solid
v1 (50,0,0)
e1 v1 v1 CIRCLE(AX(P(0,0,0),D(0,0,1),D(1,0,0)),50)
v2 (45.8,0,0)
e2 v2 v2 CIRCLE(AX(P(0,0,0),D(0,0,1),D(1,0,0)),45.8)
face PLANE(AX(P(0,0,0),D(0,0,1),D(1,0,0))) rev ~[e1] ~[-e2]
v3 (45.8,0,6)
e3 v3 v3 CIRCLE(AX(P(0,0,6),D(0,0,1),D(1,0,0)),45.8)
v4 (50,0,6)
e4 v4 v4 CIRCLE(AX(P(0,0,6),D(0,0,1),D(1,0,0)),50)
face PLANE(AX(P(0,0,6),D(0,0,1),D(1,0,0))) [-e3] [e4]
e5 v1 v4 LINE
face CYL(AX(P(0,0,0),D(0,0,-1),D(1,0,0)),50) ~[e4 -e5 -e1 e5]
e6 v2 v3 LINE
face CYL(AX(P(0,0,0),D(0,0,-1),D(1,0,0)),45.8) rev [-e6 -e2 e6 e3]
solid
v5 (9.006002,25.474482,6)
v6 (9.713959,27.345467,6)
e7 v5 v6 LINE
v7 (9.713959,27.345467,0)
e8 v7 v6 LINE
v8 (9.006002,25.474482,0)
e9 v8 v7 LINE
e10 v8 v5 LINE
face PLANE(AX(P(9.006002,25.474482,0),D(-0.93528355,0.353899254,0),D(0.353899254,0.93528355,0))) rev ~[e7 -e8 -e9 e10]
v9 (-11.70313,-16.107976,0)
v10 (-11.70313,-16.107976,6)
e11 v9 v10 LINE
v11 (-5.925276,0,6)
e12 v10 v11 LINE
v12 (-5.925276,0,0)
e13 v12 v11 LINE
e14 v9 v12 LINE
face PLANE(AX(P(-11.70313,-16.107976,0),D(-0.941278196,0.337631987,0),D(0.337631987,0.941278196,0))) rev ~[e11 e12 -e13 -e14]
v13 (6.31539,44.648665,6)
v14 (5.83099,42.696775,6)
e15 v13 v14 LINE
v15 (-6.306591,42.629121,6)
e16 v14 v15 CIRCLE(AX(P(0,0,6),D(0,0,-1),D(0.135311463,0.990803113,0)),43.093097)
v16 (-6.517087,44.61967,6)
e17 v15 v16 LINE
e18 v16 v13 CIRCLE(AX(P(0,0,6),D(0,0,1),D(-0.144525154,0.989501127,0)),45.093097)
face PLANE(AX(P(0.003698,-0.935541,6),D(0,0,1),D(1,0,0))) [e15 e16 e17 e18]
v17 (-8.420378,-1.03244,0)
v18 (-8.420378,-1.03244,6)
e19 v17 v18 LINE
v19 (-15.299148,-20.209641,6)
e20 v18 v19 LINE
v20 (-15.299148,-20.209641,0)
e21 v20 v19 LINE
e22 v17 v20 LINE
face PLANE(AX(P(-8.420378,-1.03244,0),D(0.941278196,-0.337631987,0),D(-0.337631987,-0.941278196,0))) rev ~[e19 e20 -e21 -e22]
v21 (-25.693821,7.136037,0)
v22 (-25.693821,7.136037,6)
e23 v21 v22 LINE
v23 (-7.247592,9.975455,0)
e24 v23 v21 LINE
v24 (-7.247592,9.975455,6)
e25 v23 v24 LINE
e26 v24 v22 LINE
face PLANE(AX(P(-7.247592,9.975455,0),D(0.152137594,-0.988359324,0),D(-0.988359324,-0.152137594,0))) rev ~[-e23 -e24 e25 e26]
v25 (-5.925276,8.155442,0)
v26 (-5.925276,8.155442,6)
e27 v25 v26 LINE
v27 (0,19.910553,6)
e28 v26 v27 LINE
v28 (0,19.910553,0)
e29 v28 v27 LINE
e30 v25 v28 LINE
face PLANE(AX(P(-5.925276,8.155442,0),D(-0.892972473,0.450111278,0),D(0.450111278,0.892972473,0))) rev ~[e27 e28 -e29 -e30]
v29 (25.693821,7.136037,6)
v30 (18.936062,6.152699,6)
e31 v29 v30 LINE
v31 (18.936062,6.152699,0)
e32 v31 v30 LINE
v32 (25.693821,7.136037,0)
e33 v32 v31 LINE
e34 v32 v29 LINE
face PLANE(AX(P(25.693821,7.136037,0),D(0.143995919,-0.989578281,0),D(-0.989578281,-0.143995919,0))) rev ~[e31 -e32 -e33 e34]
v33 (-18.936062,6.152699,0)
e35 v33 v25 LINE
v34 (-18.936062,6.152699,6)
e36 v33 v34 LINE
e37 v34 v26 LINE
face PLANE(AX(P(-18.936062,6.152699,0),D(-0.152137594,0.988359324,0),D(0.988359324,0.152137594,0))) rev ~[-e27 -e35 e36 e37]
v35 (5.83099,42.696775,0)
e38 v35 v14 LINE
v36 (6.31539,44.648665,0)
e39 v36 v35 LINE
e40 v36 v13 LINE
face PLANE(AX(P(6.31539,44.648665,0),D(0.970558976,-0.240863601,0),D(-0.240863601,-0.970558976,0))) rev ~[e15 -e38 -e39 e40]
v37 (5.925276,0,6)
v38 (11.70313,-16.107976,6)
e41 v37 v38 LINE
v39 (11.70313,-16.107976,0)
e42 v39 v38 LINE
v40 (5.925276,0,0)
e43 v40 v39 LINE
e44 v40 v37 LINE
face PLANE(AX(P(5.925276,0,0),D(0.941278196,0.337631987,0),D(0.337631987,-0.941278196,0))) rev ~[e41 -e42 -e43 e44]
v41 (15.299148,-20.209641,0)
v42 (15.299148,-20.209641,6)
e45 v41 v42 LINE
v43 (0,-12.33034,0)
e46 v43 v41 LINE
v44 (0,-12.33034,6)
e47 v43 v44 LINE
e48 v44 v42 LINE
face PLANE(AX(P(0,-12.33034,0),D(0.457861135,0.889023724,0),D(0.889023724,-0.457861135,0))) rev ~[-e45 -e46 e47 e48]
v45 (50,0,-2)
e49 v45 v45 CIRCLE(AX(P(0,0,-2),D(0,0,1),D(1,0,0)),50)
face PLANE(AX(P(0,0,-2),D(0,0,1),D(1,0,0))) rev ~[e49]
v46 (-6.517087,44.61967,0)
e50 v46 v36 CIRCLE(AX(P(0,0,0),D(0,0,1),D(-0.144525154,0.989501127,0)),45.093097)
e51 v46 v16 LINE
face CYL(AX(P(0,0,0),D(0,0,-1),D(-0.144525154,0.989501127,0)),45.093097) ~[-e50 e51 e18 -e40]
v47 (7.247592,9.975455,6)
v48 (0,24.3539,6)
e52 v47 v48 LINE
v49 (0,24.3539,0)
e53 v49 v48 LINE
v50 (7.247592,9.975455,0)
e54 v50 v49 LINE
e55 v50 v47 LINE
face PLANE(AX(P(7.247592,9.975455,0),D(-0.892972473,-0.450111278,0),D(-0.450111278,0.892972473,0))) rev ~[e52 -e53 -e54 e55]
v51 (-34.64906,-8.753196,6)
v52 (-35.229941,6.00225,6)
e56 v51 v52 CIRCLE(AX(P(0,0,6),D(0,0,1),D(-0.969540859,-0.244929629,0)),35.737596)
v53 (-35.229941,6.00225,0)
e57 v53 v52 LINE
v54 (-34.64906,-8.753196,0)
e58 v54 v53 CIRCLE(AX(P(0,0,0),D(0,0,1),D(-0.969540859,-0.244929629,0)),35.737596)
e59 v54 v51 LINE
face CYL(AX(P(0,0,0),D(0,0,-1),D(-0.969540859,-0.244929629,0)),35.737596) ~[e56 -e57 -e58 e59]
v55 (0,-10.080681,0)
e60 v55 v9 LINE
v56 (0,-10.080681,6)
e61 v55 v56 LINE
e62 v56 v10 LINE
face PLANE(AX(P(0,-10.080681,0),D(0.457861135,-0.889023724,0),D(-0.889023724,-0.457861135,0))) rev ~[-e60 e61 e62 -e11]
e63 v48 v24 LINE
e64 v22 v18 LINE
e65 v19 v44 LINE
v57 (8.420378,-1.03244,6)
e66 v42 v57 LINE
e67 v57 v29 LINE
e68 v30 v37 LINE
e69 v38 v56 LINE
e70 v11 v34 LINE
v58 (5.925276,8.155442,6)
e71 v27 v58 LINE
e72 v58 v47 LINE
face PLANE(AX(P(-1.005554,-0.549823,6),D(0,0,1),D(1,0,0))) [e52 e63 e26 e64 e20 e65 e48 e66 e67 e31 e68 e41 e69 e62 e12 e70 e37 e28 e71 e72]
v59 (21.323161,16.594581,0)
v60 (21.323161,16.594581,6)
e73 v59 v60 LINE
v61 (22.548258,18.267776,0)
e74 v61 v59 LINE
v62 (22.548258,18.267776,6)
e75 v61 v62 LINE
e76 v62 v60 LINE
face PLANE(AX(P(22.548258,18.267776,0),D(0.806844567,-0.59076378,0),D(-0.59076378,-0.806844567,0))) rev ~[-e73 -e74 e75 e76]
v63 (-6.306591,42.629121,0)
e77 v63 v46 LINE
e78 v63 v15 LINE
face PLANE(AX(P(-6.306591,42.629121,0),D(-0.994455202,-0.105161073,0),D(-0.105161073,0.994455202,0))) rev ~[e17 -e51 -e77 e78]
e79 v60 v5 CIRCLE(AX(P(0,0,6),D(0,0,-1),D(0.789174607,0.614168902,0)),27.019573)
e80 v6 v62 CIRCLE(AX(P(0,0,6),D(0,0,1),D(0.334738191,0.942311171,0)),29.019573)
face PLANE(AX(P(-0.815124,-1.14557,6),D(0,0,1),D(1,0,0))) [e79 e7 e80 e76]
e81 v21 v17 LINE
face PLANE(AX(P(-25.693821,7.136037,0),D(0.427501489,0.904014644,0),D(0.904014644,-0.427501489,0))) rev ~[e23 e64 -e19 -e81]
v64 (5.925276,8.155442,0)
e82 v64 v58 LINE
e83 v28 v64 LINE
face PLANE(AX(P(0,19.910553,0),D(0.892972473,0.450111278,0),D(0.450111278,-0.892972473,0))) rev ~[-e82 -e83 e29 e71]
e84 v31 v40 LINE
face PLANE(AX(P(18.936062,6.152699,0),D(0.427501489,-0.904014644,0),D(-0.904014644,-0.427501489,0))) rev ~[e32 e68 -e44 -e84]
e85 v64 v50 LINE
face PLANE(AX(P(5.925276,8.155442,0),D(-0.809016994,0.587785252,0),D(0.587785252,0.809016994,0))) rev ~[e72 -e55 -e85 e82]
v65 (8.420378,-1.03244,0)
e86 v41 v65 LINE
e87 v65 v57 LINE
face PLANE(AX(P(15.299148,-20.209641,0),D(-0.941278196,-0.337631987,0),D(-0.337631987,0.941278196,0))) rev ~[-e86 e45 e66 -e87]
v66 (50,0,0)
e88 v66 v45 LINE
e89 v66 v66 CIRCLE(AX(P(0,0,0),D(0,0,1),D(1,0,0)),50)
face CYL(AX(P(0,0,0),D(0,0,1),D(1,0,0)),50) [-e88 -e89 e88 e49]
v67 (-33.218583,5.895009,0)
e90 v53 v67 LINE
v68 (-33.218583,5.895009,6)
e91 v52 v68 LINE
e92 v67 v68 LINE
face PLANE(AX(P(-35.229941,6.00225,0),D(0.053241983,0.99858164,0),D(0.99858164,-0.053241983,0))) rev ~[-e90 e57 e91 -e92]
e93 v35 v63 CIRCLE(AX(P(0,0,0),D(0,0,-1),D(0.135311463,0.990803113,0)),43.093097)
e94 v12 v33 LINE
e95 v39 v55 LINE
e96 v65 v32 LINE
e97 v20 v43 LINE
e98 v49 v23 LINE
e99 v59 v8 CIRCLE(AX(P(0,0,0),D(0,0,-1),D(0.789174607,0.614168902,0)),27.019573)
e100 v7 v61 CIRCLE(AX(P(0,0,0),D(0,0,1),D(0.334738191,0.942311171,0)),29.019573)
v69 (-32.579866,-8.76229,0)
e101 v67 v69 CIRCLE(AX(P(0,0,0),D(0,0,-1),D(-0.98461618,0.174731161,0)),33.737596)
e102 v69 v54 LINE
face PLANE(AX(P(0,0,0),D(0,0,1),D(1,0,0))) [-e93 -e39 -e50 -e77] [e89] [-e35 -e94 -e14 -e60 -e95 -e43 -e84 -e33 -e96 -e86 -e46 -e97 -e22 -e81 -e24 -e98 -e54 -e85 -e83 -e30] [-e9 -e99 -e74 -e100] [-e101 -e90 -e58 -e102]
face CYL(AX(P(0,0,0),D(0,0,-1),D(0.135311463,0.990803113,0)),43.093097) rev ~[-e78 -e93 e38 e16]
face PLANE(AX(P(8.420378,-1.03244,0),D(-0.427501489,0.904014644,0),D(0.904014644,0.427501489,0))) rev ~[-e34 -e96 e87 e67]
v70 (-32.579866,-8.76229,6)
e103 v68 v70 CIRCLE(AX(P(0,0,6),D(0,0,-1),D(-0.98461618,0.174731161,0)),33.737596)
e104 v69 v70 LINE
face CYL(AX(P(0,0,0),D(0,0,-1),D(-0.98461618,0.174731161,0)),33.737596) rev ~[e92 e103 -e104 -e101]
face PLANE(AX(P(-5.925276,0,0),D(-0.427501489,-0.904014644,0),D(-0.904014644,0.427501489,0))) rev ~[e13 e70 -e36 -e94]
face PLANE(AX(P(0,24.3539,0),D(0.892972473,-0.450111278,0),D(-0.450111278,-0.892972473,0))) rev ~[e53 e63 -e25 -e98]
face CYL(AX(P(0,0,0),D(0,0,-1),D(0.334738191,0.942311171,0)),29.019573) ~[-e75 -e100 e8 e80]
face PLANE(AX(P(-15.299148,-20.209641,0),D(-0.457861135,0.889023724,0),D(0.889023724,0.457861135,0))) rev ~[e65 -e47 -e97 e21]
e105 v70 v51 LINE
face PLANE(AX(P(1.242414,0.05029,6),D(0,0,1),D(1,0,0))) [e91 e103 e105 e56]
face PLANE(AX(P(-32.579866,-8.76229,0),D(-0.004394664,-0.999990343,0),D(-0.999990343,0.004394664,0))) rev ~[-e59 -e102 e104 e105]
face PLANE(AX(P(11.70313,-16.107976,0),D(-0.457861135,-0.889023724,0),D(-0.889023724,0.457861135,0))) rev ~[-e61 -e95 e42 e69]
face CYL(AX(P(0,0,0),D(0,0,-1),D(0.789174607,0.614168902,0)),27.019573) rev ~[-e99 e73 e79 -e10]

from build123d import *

# Parameters (mm, degrees)
F0_R     = 50
F0_R_2   = 45.8000004292
F1_DEPTH = 2
F2_DEPTH = 6
F3_DEPTH = 6


# Not quite as in the source:
# - a feature names something its author has since deleted; it is built from what else it names


with BuildPart() as f1:
    # F0 (on Top) → F1 (new body)
    with BuildSketch(Plane.XY):
        Circle(F0_R)
        Circle(F0_R_2, mode=Mode.SUBTRACT)
        Circle(F0_R_2)
        with BuildLine():
            ThreePointArc((6.3153904824, 44.6486646761), (0.1018848259, -45.0929820902), (-6.5170868077, 44.6196704811))
            Line((-6.5170868077, 44.6196704811), (-6.3065913026, 42.6291207003))
            ThreePointArc((-6.3065913026, 42.6291207003), (0.2401945365, -43.0924277817), (5.83099002, 42.6967748305))
            Line((5.83099002, 42.6967748305), (6.3153904824, 44.6486646761))
        make_face(mode=Mode.SUBTRACT)
        with BuildLine():
            ThreePointArc((22.5482578893, 18.2677764277), (-16.757499251, -23.6922309693), (9.7139592016, 27.3454673773))
            Line((9.7139592016, 27.3454673773), (9.0060023348, 25.4744817671))
            ThreePointArc((9.0060023348, 25.4744817671), (-15.8011926323, -21.9175639786), (21.3231605276, 16.5945811779))
            Line((21.3231605276, 16.5945811779), (22.5482578893, 18.2677764277))
        make_face(mode=Mode.SUBTRACT)
        with BuildLine():
            ThreePointArc((-35.229941381, 6.0022501649), (35.7099355205, 1.405802927), (-34.6490596367, -8.7531961618))
            Line((-34.6490596367, -8.7531961618), (-32.5798660552, -8.7622896596))
            ThreePointArc((-32.5798660552, -8.7622896596), (33.7056090039, 1.4687797411), (-33.2185830072, 5.8950093511))
            Line((-33.2185830072, 5.8950093511), (-35.229941381, 6.0022501649))
        make_face(mode=Mode.SUBTRACT)
        Polygon((5.925275698, 8.1554423446), (0, 19.9105534703), (-5.925275698, 8.1554423446), (-18.9360616209, 6.1526993897), (-5.925275698, 0), (-11.7031296948, -16.1079761248), (0, -10.0806811245), (11.7031296948, -16.1079761248), (5.925275698, 0), (18.9360616209, 6.1526993897), (25.6938207233, 7.1360371941), (8.4203775276, -1.0324396403), (15.2991478945, -20.2096408815), (0, -12.3303402142), (-15.2991478945, -20.2096408815), (-8.4203775276, -1.0324396403), (-25.6938207233, 7.1360371941), (-7.2475921337, 9.9754547797), (0, 24.3538998118), (7.2475921337, 9.9754547797), align=None, mode=Mode.SUBTRACT)
        with BuildLine():
            Line((-6.3065913026, 42.6291207003), (-6.5170868077, 44.6196704811))
            ThreePointArc((-6.5170868077, 44.6196704811), (0.1018848259, -45.0929820902), (6.3153904824, 44.6486646761))
            Line((6.3153904824, 44.6486646761), (5.83099002, 42.6967748305))
            ThreePointArc((5.83099002, 42.6967748305), (0.2401945365, -43.0924277817), (-6.3065913026, 42.6291207003))
        make_face()
        with BuildLine():
            Line((-32.5798660552, -8.7622896596), (-34.6490596367, -8.7531961618))
            ThreePointArc((-34.6490596367, -8.7531961618), (35.7099355205, 1.405802927), (-35.229941381, 6.0022501649))
            Line((-35.229941381, 6.0022501649), (-33.2185830072, 5.8950093511))
            ThreePointArc((-33.2185830072, 5.8950093511), (33.7056090039, 1.4687797411), (-32.5798660552, -8.7622896596))
        make_face()
        with BuildLine():
            Line((9.0060023348, 25.4744817671), (9.7139592016, 27.3454673773))
            ThreePointArc((9.7139592016, 27.3454673773), (-16.757499251, -23.6922309693), (22.5482578893, 18.2677764277))
            Line((22.5482578893, 18.2677764277), (21.3231605276, 16.5945811779))
            ThreePointArc((21.3231605276, 16.5945811779), (-15.8011926323, -21.9175639786), (9.0060023348, 25.4744817671))
        make_face()
        Polygon((-5.925275698, 8.1554423446), (0, 19.9105534703), (5.925275698, 8.1554423446), (7.2475921337, 9.9754547797), (0, 24.3538998118), (-7.2475921337, 9.9754547797), (-25.6938207233, 7.1360371941), (-8.4203775276, -1.0324396403), (-15.2991478945, -20.2096408815), (0, -12.3303402142), (15.2991478945, -20.2096408815), (8.4203775276, -1.0324396403), (25.6938207233, 7.1360371941), (18.9360616209, 6.1526993897), (5.925275698, 0), (11.7031296948, -16.1079761248), (0, -10.0806811245), (-11.7031296948, -16.1079761248), (-5.925275698, 0), (-18.9360616209, 6.1526993897), align=None)
    extrude(amount=-F1_DEPTH)

    # F0 (on Top) → F2 (join)
    with BuildSketch(Plane.XY):
        with BuildLine():
            Line((-6.3065913026, 42.6291207003), (-6.5170868077, 44.6196704811))
            ThreePointArc((-6.5170868077, 44.6196704811), (0.1018848259, -45.0929820902), (6.3153904824, 44.6486646761))
            Line((6.3153904824, 44.6486646761), (5.83099002, 42.6967748305))
            ThreePointArc((5.83099002, 42.6967748305), (0.2401945365, -43.0924277817), (-6.3065913026, 42.6291207003))
        make_face()
        with BuildLine():
            Line((9.0060023348, 25.4744817671), (9.7139592016, 27.3454673773))
            ThreePointArc((9.7139592016, 27.3454673773), (-16.757499251, -23.6922309693), (22.5482578893, 18.2677764277))
            Line((22.5482578893, 18.2677764277), (21.3231605276, 16.5945811779))
            ThreePointArc((21.3231605276, 16.5945811779), (-15.8011926323, -21.9175639786), (9.0060023348, 25.4744817671))
        make_face()
        with BuildLine():
            Line((-32.5798660552, -8.7622896596), (-34.6490596367, -8.7531961618))
            ThreePointArc((-34.6490596367, -8.7531961618), (35.7099355205, 1.405802927), (-35.229941381, 6.0022501649))
            Line((-35.229941381, 6.0022501649), (-33.2185830072, 5.8950093511))
            ThreePointArc((-33.2185830072, 5.8950093511), (33.7056090039, 1.4687797411), (-32.5798660552, -8.7622896596))
        make_face()
        Polygon((-5.925275698, 8.1554423446), (0, 19.9105534703), (5.925275698, 8.1554423446), (7.2475921337, 9.9754547797), (0, 24.3538998118), (-7.2475921337, 9.9754547797), (-25.6938207233, 7.1360371941), (-8.4203775276, -1.0324396403), (-15.2991478945, -20.2096408815), (0, -12.3303402142), (15.2991478945, -20.2096408815), (8.4203775276, -1.0324396403), (25.6938207233, 7.1360371941), (18.9360616209, 6.1526993897), (5.925275698, 0), (11.7031296948, -16.1079761248), (0, -10.0806811245), (-11.7031296948, -16.1079761248), (-5.925275698, 0), (-18.9360616209, 6.1526993897), align=None)
    extrude(amount=F2_DEPTH)


with BuildPart() as f3:
    # F0 (on Top) → F3 (new body)
    with BuildSketch(Plane.XY):
        Circle(F0_R)
        Circle(F0_R_2, mode=Mode.SUBTRACT)
    extrude(amount=F3_DEPTH)


solid = Compound([f1.part, f3.part])
